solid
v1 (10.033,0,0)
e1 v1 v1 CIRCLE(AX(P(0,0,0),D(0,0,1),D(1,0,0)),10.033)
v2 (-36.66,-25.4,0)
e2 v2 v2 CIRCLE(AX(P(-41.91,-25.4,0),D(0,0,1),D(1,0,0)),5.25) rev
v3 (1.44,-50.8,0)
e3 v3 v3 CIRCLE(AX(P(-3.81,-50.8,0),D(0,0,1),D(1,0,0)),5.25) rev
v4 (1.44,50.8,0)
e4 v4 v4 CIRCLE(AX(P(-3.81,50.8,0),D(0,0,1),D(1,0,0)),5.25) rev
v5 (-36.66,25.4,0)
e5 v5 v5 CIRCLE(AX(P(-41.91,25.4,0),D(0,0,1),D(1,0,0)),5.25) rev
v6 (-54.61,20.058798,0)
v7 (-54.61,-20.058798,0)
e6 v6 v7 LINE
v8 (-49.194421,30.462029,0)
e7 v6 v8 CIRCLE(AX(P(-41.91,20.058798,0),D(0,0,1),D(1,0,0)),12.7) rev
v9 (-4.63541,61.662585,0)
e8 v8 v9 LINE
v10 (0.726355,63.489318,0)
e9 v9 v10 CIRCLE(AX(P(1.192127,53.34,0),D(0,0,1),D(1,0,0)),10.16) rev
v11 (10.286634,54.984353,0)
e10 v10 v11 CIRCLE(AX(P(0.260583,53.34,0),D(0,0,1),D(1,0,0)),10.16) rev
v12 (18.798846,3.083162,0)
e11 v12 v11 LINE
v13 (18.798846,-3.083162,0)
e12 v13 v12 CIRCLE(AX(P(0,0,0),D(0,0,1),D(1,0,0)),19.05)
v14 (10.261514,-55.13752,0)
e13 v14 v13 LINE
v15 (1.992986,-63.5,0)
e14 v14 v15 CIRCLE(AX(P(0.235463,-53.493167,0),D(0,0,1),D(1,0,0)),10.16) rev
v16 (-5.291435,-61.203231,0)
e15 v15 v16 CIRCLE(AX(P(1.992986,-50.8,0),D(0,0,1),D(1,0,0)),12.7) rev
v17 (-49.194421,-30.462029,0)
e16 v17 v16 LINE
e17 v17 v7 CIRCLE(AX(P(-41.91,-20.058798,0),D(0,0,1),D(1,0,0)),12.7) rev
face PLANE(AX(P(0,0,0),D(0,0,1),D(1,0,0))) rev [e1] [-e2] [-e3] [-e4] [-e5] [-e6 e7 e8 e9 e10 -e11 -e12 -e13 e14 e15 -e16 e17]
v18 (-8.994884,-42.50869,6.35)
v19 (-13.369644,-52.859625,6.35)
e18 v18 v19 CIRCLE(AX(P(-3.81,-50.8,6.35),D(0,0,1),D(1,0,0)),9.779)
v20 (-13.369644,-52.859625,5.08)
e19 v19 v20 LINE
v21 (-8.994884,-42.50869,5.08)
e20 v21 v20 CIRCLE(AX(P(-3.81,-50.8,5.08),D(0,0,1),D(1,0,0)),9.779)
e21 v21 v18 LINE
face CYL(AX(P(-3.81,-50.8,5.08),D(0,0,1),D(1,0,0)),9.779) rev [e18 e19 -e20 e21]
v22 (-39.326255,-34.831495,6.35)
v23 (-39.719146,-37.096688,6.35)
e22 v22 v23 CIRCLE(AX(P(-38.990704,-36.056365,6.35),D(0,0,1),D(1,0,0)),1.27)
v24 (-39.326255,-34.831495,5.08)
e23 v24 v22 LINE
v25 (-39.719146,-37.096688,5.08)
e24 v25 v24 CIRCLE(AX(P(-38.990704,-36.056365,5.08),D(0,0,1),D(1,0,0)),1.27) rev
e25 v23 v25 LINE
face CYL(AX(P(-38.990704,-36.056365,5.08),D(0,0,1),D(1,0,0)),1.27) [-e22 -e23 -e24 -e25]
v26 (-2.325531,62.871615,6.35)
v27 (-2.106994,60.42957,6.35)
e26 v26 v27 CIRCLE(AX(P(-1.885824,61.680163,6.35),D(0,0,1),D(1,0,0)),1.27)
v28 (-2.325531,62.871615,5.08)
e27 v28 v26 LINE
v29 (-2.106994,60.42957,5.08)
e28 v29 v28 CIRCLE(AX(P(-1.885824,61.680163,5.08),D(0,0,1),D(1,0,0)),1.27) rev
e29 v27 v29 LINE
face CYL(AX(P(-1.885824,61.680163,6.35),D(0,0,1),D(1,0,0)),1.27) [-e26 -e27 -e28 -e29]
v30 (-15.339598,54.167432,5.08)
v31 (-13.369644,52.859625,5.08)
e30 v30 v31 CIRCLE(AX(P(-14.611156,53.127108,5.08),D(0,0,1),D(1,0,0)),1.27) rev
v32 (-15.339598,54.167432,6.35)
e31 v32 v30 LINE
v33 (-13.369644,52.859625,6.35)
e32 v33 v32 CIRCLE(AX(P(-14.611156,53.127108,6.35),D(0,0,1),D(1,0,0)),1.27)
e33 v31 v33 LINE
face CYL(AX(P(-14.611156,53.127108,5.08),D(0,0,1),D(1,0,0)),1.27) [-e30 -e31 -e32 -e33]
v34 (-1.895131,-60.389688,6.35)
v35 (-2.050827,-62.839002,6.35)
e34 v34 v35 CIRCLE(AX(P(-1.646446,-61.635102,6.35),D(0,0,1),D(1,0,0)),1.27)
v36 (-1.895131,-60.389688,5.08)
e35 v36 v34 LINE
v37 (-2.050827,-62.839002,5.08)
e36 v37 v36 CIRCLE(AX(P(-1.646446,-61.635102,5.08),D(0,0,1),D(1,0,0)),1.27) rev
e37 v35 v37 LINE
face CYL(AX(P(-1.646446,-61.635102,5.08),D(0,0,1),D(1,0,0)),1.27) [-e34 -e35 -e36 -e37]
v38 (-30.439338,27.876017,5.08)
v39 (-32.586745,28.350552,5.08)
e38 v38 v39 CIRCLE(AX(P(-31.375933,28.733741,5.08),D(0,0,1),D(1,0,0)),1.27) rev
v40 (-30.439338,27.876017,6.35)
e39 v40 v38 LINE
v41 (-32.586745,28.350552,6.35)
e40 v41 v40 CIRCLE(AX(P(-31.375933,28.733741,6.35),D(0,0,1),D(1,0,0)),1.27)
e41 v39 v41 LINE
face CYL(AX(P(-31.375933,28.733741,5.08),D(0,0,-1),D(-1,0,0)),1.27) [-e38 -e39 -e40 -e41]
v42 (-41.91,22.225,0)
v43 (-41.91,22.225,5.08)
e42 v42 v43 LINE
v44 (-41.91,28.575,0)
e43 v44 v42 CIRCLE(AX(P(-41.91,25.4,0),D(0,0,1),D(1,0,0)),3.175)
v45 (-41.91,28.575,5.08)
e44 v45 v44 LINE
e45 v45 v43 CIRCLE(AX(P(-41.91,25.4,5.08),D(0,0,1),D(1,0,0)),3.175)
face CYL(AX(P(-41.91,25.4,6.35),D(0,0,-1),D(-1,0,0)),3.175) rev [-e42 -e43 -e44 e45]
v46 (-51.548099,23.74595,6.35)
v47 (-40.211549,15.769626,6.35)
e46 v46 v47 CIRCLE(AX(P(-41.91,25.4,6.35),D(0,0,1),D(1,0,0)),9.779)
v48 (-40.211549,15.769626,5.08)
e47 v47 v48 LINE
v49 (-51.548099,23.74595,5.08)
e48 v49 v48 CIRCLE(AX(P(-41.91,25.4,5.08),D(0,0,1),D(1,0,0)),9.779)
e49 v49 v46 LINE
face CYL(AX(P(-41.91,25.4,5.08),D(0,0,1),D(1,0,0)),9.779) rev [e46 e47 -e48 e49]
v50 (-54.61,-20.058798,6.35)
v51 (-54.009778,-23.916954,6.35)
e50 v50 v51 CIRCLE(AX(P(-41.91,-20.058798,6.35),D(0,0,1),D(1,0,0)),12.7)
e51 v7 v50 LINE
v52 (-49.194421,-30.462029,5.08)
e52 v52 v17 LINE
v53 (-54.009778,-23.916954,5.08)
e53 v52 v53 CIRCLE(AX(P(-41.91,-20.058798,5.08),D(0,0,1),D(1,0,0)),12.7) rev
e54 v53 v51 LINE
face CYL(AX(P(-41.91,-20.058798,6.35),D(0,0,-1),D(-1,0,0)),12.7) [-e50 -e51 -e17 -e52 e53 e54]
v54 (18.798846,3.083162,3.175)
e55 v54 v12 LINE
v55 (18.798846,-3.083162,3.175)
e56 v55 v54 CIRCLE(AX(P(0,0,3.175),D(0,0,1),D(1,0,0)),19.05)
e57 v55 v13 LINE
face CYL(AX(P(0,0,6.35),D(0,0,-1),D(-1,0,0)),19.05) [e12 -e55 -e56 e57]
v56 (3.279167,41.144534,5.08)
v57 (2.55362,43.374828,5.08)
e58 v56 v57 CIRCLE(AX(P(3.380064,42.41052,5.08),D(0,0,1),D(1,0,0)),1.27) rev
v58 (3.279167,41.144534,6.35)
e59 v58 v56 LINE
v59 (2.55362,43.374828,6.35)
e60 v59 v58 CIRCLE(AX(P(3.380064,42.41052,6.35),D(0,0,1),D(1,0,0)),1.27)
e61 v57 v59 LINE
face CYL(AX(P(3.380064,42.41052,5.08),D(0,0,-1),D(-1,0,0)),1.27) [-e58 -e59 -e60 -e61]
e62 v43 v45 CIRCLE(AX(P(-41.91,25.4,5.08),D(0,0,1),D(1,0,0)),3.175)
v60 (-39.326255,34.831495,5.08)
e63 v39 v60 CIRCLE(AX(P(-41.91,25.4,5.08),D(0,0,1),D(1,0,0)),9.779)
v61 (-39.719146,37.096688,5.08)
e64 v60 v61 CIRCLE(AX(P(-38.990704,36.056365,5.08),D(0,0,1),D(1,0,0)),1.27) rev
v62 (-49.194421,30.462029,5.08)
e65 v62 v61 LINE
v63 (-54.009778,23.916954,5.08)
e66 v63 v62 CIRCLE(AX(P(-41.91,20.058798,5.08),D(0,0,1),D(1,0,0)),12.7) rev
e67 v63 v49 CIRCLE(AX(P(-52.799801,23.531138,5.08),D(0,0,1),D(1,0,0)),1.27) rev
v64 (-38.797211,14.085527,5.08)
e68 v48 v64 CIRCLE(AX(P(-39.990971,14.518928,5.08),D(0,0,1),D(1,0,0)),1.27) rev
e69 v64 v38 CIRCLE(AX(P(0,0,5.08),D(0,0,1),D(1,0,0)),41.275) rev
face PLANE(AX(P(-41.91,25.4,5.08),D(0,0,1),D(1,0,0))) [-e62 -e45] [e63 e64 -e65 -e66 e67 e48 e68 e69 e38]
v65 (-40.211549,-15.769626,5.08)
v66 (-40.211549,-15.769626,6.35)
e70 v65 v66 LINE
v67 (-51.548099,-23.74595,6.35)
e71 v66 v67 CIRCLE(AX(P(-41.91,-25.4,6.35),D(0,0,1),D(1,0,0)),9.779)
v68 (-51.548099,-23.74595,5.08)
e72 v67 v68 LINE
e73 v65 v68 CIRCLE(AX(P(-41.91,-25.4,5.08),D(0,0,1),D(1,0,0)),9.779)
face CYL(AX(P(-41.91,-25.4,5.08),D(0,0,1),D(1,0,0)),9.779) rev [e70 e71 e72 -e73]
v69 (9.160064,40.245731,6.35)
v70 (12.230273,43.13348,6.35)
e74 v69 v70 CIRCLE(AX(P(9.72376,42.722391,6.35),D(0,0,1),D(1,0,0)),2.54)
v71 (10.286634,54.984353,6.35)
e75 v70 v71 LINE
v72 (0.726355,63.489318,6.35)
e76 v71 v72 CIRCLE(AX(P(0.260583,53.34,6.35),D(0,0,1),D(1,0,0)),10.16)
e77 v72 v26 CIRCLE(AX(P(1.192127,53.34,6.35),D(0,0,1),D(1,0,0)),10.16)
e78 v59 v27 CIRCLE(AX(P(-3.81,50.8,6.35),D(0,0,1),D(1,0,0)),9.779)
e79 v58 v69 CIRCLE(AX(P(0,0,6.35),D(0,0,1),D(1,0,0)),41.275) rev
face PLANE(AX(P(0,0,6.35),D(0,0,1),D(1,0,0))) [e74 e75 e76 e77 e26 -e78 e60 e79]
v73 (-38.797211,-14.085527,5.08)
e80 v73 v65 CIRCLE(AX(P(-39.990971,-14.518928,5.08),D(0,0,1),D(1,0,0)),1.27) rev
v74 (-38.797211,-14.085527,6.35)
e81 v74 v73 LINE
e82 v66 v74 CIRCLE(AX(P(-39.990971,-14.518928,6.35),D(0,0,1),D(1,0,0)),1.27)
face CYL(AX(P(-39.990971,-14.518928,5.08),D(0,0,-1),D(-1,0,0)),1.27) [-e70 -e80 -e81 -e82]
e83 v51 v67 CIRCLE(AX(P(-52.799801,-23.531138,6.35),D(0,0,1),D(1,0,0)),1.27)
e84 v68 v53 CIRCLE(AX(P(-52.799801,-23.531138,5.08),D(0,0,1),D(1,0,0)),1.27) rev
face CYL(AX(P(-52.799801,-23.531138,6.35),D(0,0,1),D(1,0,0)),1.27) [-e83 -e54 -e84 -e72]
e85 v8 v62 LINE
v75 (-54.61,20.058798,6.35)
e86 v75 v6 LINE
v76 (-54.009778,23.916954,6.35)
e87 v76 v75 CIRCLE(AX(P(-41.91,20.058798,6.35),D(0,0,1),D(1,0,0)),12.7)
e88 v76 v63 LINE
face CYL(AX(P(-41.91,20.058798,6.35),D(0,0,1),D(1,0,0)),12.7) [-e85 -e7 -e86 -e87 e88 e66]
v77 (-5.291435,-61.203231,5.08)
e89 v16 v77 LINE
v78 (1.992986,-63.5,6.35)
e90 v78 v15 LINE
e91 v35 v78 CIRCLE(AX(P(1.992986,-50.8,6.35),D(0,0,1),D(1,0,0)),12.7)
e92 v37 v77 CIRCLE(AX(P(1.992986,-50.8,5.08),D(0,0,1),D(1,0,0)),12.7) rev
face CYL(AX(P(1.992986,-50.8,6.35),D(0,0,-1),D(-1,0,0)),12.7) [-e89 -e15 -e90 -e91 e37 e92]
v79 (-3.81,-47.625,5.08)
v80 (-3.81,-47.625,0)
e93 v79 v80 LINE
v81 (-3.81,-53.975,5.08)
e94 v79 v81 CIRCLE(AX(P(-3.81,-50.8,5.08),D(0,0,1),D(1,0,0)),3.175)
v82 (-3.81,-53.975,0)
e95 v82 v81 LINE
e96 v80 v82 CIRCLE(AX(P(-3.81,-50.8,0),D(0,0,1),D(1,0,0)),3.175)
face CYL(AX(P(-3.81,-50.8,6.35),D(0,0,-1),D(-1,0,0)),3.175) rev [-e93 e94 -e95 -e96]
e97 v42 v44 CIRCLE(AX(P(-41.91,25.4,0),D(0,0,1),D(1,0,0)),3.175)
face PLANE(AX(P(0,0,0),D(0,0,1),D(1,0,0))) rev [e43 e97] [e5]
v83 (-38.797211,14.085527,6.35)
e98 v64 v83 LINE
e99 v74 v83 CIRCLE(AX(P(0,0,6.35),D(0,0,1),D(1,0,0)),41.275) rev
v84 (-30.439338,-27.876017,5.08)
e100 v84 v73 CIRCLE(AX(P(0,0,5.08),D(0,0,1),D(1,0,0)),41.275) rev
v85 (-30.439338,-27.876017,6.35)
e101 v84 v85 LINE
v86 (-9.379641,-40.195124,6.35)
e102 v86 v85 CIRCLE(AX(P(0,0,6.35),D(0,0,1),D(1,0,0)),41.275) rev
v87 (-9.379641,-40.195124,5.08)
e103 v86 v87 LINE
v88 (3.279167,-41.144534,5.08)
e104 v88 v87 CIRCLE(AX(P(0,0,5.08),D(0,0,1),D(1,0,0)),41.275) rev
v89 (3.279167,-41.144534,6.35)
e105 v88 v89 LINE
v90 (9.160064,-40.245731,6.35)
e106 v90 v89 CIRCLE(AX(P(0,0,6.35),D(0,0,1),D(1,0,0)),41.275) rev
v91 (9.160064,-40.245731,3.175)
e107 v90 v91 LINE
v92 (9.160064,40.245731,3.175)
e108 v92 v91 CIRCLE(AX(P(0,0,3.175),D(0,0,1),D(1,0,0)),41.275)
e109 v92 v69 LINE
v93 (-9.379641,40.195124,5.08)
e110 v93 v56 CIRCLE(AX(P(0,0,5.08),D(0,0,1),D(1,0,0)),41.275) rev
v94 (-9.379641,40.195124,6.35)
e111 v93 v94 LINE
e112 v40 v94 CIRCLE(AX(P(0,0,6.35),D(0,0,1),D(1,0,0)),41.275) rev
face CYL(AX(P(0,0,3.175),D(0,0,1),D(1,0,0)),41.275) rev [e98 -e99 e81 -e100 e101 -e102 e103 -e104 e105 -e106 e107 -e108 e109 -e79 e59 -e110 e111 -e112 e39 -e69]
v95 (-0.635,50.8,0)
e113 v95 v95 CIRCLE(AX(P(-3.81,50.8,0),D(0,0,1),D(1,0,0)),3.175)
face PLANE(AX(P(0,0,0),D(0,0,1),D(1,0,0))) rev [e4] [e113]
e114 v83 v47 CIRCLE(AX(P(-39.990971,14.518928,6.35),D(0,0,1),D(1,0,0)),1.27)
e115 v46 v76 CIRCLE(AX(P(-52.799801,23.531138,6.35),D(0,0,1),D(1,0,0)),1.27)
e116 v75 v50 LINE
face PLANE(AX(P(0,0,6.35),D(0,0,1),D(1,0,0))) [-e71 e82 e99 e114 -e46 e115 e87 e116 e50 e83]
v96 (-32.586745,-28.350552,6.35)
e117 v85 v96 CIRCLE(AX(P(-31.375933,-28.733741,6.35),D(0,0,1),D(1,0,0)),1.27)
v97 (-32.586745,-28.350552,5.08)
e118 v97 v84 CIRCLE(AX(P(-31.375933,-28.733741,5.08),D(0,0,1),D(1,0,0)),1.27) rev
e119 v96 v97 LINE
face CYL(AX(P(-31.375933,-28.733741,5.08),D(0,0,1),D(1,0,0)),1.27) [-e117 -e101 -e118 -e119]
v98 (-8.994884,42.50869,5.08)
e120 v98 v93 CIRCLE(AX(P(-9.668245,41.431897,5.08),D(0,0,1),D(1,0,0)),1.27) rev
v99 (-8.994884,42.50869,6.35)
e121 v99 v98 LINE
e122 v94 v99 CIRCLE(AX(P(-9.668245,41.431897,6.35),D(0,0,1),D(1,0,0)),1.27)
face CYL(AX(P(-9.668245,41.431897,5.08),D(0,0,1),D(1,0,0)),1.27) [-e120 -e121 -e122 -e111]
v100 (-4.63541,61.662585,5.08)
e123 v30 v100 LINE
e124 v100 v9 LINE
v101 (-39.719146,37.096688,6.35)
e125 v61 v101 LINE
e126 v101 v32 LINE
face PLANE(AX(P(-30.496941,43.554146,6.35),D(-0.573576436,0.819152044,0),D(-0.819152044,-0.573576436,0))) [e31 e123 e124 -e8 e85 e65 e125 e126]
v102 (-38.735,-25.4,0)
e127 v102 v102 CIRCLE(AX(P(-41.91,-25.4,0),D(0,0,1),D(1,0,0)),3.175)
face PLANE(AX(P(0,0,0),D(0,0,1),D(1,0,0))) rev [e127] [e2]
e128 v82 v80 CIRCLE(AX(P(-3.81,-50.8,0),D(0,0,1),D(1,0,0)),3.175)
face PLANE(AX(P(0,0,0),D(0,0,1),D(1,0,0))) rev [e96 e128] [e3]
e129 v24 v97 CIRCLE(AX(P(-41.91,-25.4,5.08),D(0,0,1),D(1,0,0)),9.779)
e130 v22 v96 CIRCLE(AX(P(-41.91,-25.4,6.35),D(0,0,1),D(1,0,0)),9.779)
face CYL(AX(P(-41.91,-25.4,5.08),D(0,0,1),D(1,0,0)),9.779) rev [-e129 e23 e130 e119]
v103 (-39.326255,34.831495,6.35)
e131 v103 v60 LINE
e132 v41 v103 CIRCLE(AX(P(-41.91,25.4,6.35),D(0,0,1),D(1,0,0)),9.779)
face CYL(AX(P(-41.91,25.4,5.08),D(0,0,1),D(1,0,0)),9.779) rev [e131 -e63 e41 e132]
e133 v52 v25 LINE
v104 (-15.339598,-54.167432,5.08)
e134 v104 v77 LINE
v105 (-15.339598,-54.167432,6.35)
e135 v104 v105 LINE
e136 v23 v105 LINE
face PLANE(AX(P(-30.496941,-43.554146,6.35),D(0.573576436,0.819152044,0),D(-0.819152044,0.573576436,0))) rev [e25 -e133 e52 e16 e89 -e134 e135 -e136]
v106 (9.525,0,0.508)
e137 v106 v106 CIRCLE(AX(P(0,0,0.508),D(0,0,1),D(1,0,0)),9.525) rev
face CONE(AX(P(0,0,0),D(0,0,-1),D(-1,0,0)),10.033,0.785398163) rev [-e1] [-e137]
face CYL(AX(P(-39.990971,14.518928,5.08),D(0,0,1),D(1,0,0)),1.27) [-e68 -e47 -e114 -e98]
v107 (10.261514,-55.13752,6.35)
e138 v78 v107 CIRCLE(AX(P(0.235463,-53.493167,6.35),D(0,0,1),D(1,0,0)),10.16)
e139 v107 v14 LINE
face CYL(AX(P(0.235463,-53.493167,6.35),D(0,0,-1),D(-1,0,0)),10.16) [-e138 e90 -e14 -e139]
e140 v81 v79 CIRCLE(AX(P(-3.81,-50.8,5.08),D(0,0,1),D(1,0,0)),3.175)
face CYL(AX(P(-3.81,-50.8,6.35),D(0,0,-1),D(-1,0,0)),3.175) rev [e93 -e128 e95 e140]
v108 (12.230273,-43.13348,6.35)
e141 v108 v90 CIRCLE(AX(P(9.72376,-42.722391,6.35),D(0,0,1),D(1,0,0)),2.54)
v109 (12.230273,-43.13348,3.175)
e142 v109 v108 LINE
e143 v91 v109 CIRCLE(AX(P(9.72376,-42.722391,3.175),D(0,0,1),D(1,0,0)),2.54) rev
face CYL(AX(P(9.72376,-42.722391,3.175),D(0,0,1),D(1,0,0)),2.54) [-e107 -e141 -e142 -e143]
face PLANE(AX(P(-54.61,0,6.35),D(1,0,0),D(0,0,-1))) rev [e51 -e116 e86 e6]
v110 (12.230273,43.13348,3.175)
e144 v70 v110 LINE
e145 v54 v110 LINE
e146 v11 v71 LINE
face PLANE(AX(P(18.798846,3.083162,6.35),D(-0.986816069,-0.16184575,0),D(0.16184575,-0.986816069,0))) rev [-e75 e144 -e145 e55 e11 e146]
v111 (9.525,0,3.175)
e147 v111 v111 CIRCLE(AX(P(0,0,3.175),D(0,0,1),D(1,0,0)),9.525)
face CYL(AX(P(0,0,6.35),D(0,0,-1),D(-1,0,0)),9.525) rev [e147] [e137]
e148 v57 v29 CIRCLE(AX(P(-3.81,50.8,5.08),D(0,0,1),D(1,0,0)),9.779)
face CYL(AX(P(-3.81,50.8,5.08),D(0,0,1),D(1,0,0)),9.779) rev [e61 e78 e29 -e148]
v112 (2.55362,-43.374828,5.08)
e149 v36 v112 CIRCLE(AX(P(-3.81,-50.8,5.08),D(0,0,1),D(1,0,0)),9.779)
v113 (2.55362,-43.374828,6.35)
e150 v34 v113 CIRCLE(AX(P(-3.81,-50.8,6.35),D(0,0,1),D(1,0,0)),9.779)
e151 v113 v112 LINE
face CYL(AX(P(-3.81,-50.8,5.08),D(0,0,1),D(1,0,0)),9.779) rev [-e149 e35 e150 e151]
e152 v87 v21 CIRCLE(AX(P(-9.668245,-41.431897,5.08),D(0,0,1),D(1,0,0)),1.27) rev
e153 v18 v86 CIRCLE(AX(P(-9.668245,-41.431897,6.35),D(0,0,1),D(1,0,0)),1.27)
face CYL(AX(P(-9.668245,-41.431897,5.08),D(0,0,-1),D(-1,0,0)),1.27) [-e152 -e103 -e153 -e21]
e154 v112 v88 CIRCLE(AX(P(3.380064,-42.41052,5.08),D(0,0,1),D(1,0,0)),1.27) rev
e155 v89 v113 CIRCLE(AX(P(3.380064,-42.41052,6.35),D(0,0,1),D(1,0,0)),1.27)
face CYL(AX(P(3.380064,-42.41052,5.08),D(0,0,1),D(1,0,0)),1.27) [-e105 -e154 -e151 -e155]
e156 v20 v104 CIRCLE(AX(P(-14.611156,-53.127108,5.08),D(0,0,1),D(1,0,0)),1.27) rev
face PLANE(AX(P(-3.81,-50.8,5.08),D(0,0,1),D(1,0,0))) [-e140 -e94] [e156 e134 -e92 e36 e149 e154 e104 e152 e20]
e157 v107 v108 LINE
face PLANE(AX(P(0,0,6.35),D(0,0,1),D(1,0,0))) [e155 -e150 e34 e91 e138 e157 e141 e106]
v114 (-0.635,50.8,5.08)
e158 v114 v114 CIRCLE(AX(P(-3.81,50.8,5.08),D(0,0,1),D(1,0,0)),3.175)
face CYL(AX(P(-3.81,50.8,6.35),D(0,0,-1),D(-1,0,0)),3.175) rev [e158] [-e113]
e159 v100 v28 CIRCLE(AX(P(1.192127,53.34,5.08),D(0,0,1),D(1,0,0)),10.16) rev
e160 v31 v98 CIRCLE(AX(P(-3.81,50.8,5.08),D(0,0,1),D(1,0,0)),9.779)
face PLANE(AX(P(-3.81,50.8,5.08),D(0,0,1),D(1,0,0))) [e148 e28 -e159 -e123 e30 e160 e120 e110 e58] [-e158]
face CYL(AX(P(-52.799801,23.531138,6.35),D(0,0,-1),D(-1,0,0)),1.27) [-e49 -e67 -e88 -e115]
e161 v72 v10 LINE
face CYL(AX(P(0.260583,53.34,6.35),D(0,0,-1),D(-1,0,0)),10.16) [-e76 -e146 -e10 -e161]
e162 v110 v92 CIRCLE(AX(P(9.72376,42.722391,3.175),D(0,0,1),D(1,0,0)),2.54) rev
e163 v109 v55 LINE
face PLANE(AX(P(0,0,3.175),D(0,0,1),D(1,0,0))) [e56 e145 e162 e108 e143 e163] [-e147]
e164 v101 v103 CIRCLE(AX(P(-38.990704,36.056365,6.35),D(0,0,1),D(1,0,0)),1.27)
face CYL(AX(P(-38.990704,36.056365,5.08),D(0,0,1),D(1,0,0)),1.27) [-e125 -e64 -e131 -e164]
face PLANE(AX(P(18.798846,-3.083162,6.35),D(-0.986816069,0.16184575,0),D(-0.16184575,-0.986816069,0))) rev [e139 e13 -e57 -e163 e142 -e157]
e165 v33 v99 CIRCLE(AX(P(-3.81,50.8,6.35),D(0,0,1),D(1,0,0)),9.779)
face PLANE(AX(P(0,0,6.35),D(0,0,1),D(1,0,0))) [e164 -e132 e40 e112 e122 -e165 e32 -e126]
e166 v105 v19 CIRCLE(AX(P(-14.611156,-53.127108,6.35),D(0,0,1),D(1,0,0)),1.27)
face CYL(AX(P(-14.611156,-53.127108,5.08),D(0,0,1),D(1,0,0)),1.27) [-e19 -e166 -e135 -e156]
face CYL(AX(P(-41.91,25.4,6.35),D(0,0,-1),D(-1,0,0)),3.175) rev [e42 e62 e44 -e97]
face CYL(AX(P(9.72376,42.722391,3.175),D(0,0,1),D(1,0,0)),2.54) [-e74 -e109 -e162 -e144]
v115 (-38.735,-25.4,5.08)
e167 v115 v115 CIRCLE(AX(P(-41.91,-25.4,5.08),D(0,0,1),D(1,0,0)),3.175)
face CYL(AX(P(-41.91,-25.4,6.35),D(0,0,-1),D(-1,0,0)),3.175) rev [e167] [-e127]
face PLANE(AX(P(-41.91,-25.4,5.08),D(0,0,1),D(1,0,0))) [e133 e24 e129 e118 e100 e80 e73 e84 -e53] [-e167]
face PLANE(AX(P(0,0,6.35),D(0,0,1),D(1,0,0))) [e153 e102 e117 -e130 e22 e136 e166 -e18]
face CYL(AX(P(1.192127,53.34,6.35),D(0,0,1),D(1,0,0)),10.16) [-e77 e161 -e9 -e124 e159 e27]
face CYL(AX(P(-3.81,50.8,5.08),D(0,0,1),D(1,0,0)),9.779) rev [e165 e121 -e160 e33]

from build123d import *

# Parameters (mm, degrees)
SKETCH1_R           = 3.174999999999998
SKETCH1_R_2         = 3.1750000000000105
SKETCH1_R_3         = 3.17500000000001
SKETCH1_R_4         = 9.525
BOSS_EXTRUDE1_DEPTH = 6.35
SKETCH12_R          = 41.275000000000006
CUT_EXTRUDE3_DEPTH  = 3.175
FILLET3_R           = 12.7
FILLET5_R           = 10.16
FILLET6_R           = 12.7
CHAMFER1_SIZE       = 0.508
SKETCH16_R          = 9.779
SKETCH16_R_2        = 9.778999999999995
CUT_EXTRUDE6_DEPTH  = 1.27
FILLET7_R           = 1.27
FILLET8_R           = 2.54


with BuildPart() as part:
    # Sketch1 → Boss-Extrude1 (new body)
    with BuildSketch(Plane.XY):
        with BuildLine():
            Line((8.889999999999999, -63.5), (18.798846105166316, -3.0831615452767167))
            ThreePointArc((18.79884610516632, -3.0831615452767163), (19.049999999999997, -4.4e-16), (18.798846105166323, 3.083161545276716))
            Line((18.798846105166316, 3.083161545276716), (8.889999999999999, 63.5))
            Line((8.889999999999999, 63.5), (-2.0113089116884844, 63.5))
            Line((-2.011308911688488, 63.5), (-54.610000000000014, 26.669999999999998))
            Line((-54.61000000000001, 26.67), (-54.61000000000001, -26.67))
            Line((-54.610000000000014, -26.669999999999998), (-2.011308911688488, -63.5))
            Line((-2.011308911688488, -63.5), (8.89, -63.5))
        make_face()
        with Locations((-41.910000000000004, -25.4)):
            Circle(SKETCH1_R, mode=Mode.SUBTRACT)
        with Locations((-3.8099999999999934, -50.8)):
            Circle(SKETCH1_R_2, mode=Mode.SUBTRACT)
        with Locations((-41.910000000000004, 25.4)):
            Circle(SKETCH1_R, mode=Mode.SUBTRACT)
        with Locations((-3.8100000000000063, 50.8)):
            Circle(SKETCH1_R_3, mode=Mode.SUBTRACT)
        Circle(SKETCH1_R_4, mode=Mode.SUBTRACT)
    extrude(amount=BOSS_EXTRUDE1_DEPTH)

    # Sketch12 → Cut-Extrude3 (cut)
    with BuildSketch(Plane.XY.offset(6.35)):
        Circle(SKETCH12_R)
    extrude(amount=-CUT_EXTRUDE3_DEPTH, mode=Mode.SUBTRACT)

    # Fillet3
    fillet3_edges = [part.edges().sort_by_distance(p)[0] for p in [
        (-2.011308911688488, -63.5, 3.175),
        (-54.610000000000014, -26.67, 3.175),
    ]]
    fillet(fillet3_edges, radius=FILLET3_R)

    # Fillet5
    # the kernel refuses this fillet: 10.16 mm, written as the material it takes off along each edge
    with BuildSketch(Plane(origin=(8.889999999999999, 63.5, -21.57354203982315), x_dir=(-1, 0, 0), z_dir=(0, 0, 1))) as fillet5_piece_1:
        with BuildLine():
            CenterArc((FILLET5_R * 0.849352048812, FILLET5_R), FILLET5_R, 189.31404643684508, 80.68595356315495)
            Line((-FILLET5_R * 0.137464019701, FILLET5_R * 0.838154249592), (0, 0))
            Line((0, 0), (FILLET5_R * 0.849352048812, 0))
        make_face()
    extrude(amount=49.4970840796463, mode=Mode.SUBTRACT)
    with BuildSketch(Plane(origin=(-2.011308911688486, 63.5, -8.008589237526252), x_dir=(-0.8191520442889891, -0.5735764363510498, 0), z_dir=(0, 0, 1))) as fillet5_piece_2:
        with BuildLine():
            CenterArc((FILLET5_R * 0.315298788879, FILLET5_R), FILLET5_R, 234.99999999999972, 35.000000000000284)
            Line((-FILLET5_R * 0.258277647472, FILLET5_R * 0.180847955711), (0, 0))
            Line((0, 0), (FILLET5_R * 0.315298788879, 2e-17))
        make_face()
    extrude(amount=22.36717847505251, mode=Mode.SUBTRACT)
    with BuildSketch(Plane(origin=(8.89, -63.5, -21.185509481386156), x_dir=(-1, -1.03e-15, 0), z_dir=(0, 0, 1))) as fillet5_piece_3:
        with BuildLine():
            CenterArc((8.654537384170473, -10.006833294491324), FILLET5_R, 99.961393021195, 70.72456054195987)
            Line((-1.3715138719182247, -8.362480470343732), (0, 0))
            Line((0, 0), (6.897014292925349, 0))
        make_face()
    extrude(amount=48.721018962772305, mode=Mode.SUBTRACT)

    # Fillet6
    fillet6_edges = [part.edges().sort_by_distance(p)[0] for p in [
        (-54.610000000000014, 26.67, 3.175),
    ]]
    fillet(fillet6_edges, radius=FILLET6_R)

    # Chamfer1
    chamfer1_edges = [part.edges().sort_by_distance(p)[0] for p in [
        (-9.525, 1.17e-15, 0),
    ]]
    chamfer(chamfer1_edges, length=CHAMFER1_SIZE)

    # Sketch16 → Cut-Extrude6 (cut)
    with BuildSketch(Plane.XY.offset(6.35)):
        with Locations((-3.8100000000000063, 50.8)):
            Circle(SKETCH16_R)
        with Locations((-41.910000000000004, 25.4)):
            Circle(SKETCH16_R_2)
        with Locations((-41.910000000000004, -25.4)):
            Circle(SKETCH16_R_2)
        with Locations((-3.8099999999999934, -50.8)):
            Circle(SKETCH16_R)
    extrude(amount=-CUT_EXTRUDE6_DEPTH, mode=Mode.SUBTRACT)

    # Fillet7
    # the kernel refuses this fillet: 1.27 mm, written as the material it takes off along each edge
    with BuildSketch(Plane(origin=(-51.05033996469843, 28.876064776401133, 5.08), x_dir=(-0.09657343245290265, -0.9953258622904685, 0), z_dir=(0, 0, 1))) as fillet7_piece_1:
        with BuildLine():
            CenterArc((5.488895056500577, -1.2251054888152173), FILLET7_R, 105.27988641723195, 152.57651314637792)
            ThreePointArc((5.2217345964190285, -2.46668725759608), (2.468798122573326, -1.5340901167119672), (0, 0))
            ThreePointArc((0, 0), (2.5771031667716113, -0.34568773612281406), (5.154206333543225, 2e-17))
        make_face()
    extrude(amount=15.707593770740127, mode=Mode.SUBTRACT)
    with BuildSketch(Plane(origin=(-51.05033996469843, -28.876064776401122, 5.08), x_dir=(-0.09657343245290317, 0.9953258622904685, 0), z_dir=(0, 0, 1))) as fillet7_piece_2:
        with BuildLine():
            CenterArc((5.488895056500547, 1.2251054888152175), FILLET7_R, 102.14360043639026, 152.57651314637792)
            ThreePointArc((5.221734596418995, 2.4666872575960808), (2.468798122573309, 1.5340901167119605), (0, 0))
            ThreePointArc((0, 0), (2.577103166771601, 0.3456877361228138), (5.154206333543198, 2e-17))
        make_face()
    extrude(amount=15.707593770740052, mode=Mode.SUBTRACT)
    with BuildSketch(Plane(origin=(-4.405896500363429, -41.03917276247275, 5.08), x_dir=(-0.9859045184277648, 0.16730893742928732, 0), z_dir=(0, 0, 1))) as fillet7_piece_3:
        with BuildLine():
            CenterArc((5.122467383032978, 1.267626206798734), FILLET7_R, 131.65076211968278, 134.84555428453902)
            ThreePointArc((4.278440018803308, 2.2165823746123587), (2.277882855344697, 0.8406446175243522), (0, 0))
            ThreePointArc((0, 0), (2.522427120432931, 0.07714827904124132), (5.044854240865812, -6e-17))
        make_face()
    extrude(amount=13.88213560216453, mode=Mode.SUBTRACT)
    with BuildSketch(Plane(origin=(-1.764835382793802, -41.237252346290475, 5.08), x_dir=(0.9998310962098215, 0.01837876633146887, 0), z_dir=(0, 0, 1))) as fillet7_piece_4:
        with BuildLine():
            CenterArc((5.1224673830329825, -1.267626206798732), FILLET7_R, 93.5036835957782, 134.84555428453882)
            ThreePointArc((4.27844001880331, -2.216582374612353), (2.2778828553446977, -0.8406446175243475), (0, 0))
            ThreePointArc((0, 0), (2.522427120432899, -0.07714827904124524), (5.044854240865816, 0))
        make_face()
    extrude(amount=13.88213560216454, mode=Mode.SUBTRACT)
    with BuildSketch(Plane(origin=(-1.7648353827938124, 41.237252346290475, 5.08), x_dir=(0.9998310962098215, -0.018378766331468933, 0), z_dir=(0, 0, 1))) as fillet7_piece_5:
        with BuildLine():
            CenterArc((5.122467383032965, 1.267626206798732), FILLET7_R, 131.65076211968247, 134.84555428453936)
            ThreePointArc((4.278440018803301, 2.21658237461236), (2.277882855344692, 0.8406446175243475), (0, 0))
            ThreePointArc((0, 0), (2.5224271204329014, 0.07714827904124544), (5.044854240865799, 0))
        make_face()
    extrude(amount=13.882135602164494, mode=Mode.SUBTRACT)
    with BuildSketch(Plane(origin=(-4.40589650036344, 41.03917276247275, 5.08), x_dir=(-0.9859045184277646, -0.1673089374292877, 0), z_dir=(0, 0, 1))) as fillet7_piece_6:
        with BuildLine():
            CenterArc((5.122467383032965, -1.2676262067987338), FILLET7_R, 93.50368359577817, 134.84555428453905)
            ThreePointArc((4.278440018803295, -2.2165823746123583), (2.2778828553446893, -0.8406446175243446), (0, 0))
            ThreePointArc((0, 0), (2.5224271204328996, -0.07714827904124434), (5.044854240865799, -2e-17))
        make_face()
    extrude(amount=13.882135602164501, mode=Mode.SUBTRACT)
    with BuildSketch(Plane(origin=(-11.473504174062986, 56.87449954927312, 5.08), x_dir=(-0.42704799488174705, -0.9042289588746201, 0), z_dir=(0, 0, 1))) as fillet7_piece_7:
        with BuildLine():
            CenterArc((4.728427365439227, -1.2368396432560318), FILLET7_R, 103.12184472435666, 137.15851910421196)
            Line((4.098816822386599, -2.3397859538609374), (0, 0))
            ThreePointArc((0, 0), (2.2200543118220843, -0.25533474692856073), (4.440108623644155, 3e-17))
        make_face()
    extrude(amount=13.069072435302997, mode=Mode.SUBTRACT)
    with BuildSketch(Plane(origin=(-6.897089605429491, 60.07893952820306, 5.08), x_dir=(0.997331674160986, 0.07300364179439761, 0), z_dir=(0, 0, 1))) as fillet7_piece_8:
        with BuildLine():
            CenterArc((5.114789119152491, 1.2311102698497796), FILLET7_R, 106.07013934022241, 149.71417700442854)
            Line((4.763235479566721, 2.4514831794532332), (4.728080115608144, 2.5735204704135772))
            ThreePointArc((4.728080115608144, 2.5735204704135772), (2.3062016688784, 1.523381308565702), (-0.0650550978688258, 0.1090726099498725))
            Line((-0.0650550978688258, 0.1090726099498725), (0.03118773853141711, -0.12311102698497907))
            ThreePointArc((0.03118773853141711, -0.12311102698497907), (2.401455866919156, 0.17245092215670987), (4.771723995306896, -0.12311102698497724))
            Line((4.771723995306896, -0.12311102698497724), (4.802911733838314, 2e-17))
        make_face()
    extrude(amount=14.662671039822802, mode=Mode.SUBTRACT)
    with BuildSketch(Plane(origin=(-42.48178221863479, 35.16226951556107, 5.08), x_dir=(0.9945508568129161, -0.1042525453535521, 0), z_dir=(0, 0, 1))) as fillet7_piece_9:
        with BuildLine():
            CenterArc((3.378842887065313, 1.2531771116180899), FILLET7_R, 130.98410421956518, 129.67977154849987)
            Line((2.5459138672912713, 2.211889397978423), (0, 0))
            ThreePointArc((0, 0), (1.5864079408782286, 0.12953624054069557), (3.172815881756456, -1e-17))
        make_face()
    extrude(amount=9.701389316326873, mode=Mode.SUBTRACT)
    with BuildSketch(Plane(origin=(-37.82742730230863, 16.513974951190757, 5.08), x_dir=(-0.3708645160377428, -0.9286869821118904, 0), z_dir=(0, 0, 1))) as fillet7_piece_10:
        with BuildLine():
            CenterArc((2.6551557133591124, -1.2693626655560193), FILLET7_R, 91.81525494531378, 119.95574465095598)
            ThreePointArc((1.5754533971303504, -1.938050117457313), (0.8498547884410469, -0.9185207351456427), (0, 0))
            ThreePointArc((0, 0), (1.3074630406692571, -0.02071336942930664), (2.6149260813385156, -8e-17))
        make_face()
    extrude(amount=7.80731520334629, mode=Mode.SUBTRACT)
    with BuildSketch(Plane(origin=(-32.14341460501172, 25.89259590173067, 5.08), x_dir=(0.6516730455592312, 0.7584999945231087, 0), z_dir=(0, 0, 1))) as fillet7_piece_11:
        with BuildLine():
            CenterArc((2.6551557133590844, 1.269362665556021), FILLET7_R, 148.22900040373005, 119.9557446509564)
            ThreePointArc((1.5754533971303242, 1.9380501174573181), (0.8498547884410366, 0.9185207351456415), (0, 0))
            ThreePointArc((0, 0), (1.3074630406692533, 0.02071336942930512), (2.6149260813384925, 6e-17))
        make_face()
    extrude(amount=7.807315203346233, mode=Mode.SUBTRACT)
    with BuildSketch(Plane(origin=(-42.48178221863479, -35.16226951556107, 5.08), x_dir=(0.9945508568129161, 0.1042525453535521, 0), z_dir=(0, 0, 1))) as fillet7_piece_12:
        with BuildLine():
            CenterArc((3.378842887065313, -1.2531771116180899), FILLET7_R, 99.33612423193495, 129.67977154849942)
            Line((2.545913867291265, -2.211889397978415), (0, 0))
            ThreePointArc((0, 0), (1.5864079408782357, -0.12953624054069632), (3.172815881756456, 1e-17))
        make_face()
    extrude(amount=9.701389316326848, mode=Mode.SUBTRACT)
    with BuildSketch(Plane(origin=(-32.14341460501172, -25.89259590173067, 5.08), x_dir=(0.6516730455592307, -0.7584999945231092, 0), z_dir=(0, 0, 1))) as fillet7_piece_13:
        with BuildLine():
            CenterArc((2.6551557133590933, -1.2693626655560208), FILLET7_R, 91.81525494531361, 119.9557446509562)
            ThreePointArc((1.575453397130333, -1.938050117457314), (0.84985478844104, -0.9185207351456431), (0, 0))
            ThreePointArc((0, 0), (1.3074630406692458, -0.02071336942930215), (2.6149260813385, 1.9e-16))
        make_face()
    extrude(amount=7.807315203346251, mode=Mode.SUBTRACT)
    with BuildSketch(Plane(origin=(-37.82742730230863, -16.513974951190757, 5.08), x_dir=(-0.3708645160377417, 0.9286869821118909, 0), z_dir=(0, 0, 1))) as fillet7_piece_14:
        with BuildLine():
            CenterArc((2.6551557133591, 1.2693626655560195), FILLET7_R, 148.22900040372966, 119.95574465095666)
            ThreePointArc((1.5754533971303442, 1.9380501174573244), (0.8498547884410458, 0.9185207351456438), (0, 0))
            ThreePointArc((0, 0), (1.307463040669268, 0.02071336942931157), (2.614926081338505, -4e-17))
        make_face()
    extrude(amount=7.807315203346262, mode=Mode.SUBTRACT)
    with BuildSketch(Plane(origin=(-11.47350417406296, -56.87449954927313, 5.08), x_dir=(-0.4270479948817493, 0.904228958874619, 0), z_dir=(0, 0, 1))) as fillet7_piece_15:
        with BuildLine():
            CenterArc((4.728427365439235, 1.2368396432560307), FILLET7_R, 119.71963617143108, 137.15851910421213)
            Line((4.0988168223866115, 2.3397859538609413), (0, 0))
            ThreePointArc((0, 0), (2.220054311822089, 0.2553347469285633), (4.440108623644161, -6e-17))
        make_face()
    extrude(amount=13.069072435303026, mode=Mode.SUBTRACT)
    with BuildSketch(Plane(origin=(-6.897089605429501, -60.078939528203044, 5.08), x_dir=(0.9980757885501166, -0.06200580868001733, 0), z_dir=(0, 0, 1))) as fillet7_piece_16:
        with BuildLine():
            CenterArc((5.337031219122812, -1.2275977109055105), FILLET7_R, 104.84725695810936, 150.14086959564875)
            Line((5.00807682361887, -2.4542553671725873), (4.975181384068476, -2.5769211327992934))
            ThreePointArc((4.975181384068476, -2.5769211327992934), (1.6060241192382974, -1.1309170431421127), (-0.06625343227148527, -0.10834889345188184))
            Line((-0.06625343227148527, -0.10834889345188184), (0.0325428732873341, 0.1227597710905526))
            ThreePointArc((0.0325428732873341, 0.1227597710905526), (2.505801243124729, -0.19949762602756604), (4.979059612962133, 0.12275977109054963))
            Line((4.979059612962133, 0.12275977109054963), (5.011602486249467, 0))
        make_face()
    extrude(amount=15.212785517644045, mode=Mode.SUBTRACT)

    # Fillet8
    fillet8_edges = [part.edges().sort_by_distance(p)[0] for p in [
        (12.872720520102035, 39.21630644784571, 4.762499999999999),
        (12.872720520102039, -39.21630644784571, 4.762499999999999),
    ]]
    fillet(fillet8_edges, radius=FILLET8_R)


solid = part.part
